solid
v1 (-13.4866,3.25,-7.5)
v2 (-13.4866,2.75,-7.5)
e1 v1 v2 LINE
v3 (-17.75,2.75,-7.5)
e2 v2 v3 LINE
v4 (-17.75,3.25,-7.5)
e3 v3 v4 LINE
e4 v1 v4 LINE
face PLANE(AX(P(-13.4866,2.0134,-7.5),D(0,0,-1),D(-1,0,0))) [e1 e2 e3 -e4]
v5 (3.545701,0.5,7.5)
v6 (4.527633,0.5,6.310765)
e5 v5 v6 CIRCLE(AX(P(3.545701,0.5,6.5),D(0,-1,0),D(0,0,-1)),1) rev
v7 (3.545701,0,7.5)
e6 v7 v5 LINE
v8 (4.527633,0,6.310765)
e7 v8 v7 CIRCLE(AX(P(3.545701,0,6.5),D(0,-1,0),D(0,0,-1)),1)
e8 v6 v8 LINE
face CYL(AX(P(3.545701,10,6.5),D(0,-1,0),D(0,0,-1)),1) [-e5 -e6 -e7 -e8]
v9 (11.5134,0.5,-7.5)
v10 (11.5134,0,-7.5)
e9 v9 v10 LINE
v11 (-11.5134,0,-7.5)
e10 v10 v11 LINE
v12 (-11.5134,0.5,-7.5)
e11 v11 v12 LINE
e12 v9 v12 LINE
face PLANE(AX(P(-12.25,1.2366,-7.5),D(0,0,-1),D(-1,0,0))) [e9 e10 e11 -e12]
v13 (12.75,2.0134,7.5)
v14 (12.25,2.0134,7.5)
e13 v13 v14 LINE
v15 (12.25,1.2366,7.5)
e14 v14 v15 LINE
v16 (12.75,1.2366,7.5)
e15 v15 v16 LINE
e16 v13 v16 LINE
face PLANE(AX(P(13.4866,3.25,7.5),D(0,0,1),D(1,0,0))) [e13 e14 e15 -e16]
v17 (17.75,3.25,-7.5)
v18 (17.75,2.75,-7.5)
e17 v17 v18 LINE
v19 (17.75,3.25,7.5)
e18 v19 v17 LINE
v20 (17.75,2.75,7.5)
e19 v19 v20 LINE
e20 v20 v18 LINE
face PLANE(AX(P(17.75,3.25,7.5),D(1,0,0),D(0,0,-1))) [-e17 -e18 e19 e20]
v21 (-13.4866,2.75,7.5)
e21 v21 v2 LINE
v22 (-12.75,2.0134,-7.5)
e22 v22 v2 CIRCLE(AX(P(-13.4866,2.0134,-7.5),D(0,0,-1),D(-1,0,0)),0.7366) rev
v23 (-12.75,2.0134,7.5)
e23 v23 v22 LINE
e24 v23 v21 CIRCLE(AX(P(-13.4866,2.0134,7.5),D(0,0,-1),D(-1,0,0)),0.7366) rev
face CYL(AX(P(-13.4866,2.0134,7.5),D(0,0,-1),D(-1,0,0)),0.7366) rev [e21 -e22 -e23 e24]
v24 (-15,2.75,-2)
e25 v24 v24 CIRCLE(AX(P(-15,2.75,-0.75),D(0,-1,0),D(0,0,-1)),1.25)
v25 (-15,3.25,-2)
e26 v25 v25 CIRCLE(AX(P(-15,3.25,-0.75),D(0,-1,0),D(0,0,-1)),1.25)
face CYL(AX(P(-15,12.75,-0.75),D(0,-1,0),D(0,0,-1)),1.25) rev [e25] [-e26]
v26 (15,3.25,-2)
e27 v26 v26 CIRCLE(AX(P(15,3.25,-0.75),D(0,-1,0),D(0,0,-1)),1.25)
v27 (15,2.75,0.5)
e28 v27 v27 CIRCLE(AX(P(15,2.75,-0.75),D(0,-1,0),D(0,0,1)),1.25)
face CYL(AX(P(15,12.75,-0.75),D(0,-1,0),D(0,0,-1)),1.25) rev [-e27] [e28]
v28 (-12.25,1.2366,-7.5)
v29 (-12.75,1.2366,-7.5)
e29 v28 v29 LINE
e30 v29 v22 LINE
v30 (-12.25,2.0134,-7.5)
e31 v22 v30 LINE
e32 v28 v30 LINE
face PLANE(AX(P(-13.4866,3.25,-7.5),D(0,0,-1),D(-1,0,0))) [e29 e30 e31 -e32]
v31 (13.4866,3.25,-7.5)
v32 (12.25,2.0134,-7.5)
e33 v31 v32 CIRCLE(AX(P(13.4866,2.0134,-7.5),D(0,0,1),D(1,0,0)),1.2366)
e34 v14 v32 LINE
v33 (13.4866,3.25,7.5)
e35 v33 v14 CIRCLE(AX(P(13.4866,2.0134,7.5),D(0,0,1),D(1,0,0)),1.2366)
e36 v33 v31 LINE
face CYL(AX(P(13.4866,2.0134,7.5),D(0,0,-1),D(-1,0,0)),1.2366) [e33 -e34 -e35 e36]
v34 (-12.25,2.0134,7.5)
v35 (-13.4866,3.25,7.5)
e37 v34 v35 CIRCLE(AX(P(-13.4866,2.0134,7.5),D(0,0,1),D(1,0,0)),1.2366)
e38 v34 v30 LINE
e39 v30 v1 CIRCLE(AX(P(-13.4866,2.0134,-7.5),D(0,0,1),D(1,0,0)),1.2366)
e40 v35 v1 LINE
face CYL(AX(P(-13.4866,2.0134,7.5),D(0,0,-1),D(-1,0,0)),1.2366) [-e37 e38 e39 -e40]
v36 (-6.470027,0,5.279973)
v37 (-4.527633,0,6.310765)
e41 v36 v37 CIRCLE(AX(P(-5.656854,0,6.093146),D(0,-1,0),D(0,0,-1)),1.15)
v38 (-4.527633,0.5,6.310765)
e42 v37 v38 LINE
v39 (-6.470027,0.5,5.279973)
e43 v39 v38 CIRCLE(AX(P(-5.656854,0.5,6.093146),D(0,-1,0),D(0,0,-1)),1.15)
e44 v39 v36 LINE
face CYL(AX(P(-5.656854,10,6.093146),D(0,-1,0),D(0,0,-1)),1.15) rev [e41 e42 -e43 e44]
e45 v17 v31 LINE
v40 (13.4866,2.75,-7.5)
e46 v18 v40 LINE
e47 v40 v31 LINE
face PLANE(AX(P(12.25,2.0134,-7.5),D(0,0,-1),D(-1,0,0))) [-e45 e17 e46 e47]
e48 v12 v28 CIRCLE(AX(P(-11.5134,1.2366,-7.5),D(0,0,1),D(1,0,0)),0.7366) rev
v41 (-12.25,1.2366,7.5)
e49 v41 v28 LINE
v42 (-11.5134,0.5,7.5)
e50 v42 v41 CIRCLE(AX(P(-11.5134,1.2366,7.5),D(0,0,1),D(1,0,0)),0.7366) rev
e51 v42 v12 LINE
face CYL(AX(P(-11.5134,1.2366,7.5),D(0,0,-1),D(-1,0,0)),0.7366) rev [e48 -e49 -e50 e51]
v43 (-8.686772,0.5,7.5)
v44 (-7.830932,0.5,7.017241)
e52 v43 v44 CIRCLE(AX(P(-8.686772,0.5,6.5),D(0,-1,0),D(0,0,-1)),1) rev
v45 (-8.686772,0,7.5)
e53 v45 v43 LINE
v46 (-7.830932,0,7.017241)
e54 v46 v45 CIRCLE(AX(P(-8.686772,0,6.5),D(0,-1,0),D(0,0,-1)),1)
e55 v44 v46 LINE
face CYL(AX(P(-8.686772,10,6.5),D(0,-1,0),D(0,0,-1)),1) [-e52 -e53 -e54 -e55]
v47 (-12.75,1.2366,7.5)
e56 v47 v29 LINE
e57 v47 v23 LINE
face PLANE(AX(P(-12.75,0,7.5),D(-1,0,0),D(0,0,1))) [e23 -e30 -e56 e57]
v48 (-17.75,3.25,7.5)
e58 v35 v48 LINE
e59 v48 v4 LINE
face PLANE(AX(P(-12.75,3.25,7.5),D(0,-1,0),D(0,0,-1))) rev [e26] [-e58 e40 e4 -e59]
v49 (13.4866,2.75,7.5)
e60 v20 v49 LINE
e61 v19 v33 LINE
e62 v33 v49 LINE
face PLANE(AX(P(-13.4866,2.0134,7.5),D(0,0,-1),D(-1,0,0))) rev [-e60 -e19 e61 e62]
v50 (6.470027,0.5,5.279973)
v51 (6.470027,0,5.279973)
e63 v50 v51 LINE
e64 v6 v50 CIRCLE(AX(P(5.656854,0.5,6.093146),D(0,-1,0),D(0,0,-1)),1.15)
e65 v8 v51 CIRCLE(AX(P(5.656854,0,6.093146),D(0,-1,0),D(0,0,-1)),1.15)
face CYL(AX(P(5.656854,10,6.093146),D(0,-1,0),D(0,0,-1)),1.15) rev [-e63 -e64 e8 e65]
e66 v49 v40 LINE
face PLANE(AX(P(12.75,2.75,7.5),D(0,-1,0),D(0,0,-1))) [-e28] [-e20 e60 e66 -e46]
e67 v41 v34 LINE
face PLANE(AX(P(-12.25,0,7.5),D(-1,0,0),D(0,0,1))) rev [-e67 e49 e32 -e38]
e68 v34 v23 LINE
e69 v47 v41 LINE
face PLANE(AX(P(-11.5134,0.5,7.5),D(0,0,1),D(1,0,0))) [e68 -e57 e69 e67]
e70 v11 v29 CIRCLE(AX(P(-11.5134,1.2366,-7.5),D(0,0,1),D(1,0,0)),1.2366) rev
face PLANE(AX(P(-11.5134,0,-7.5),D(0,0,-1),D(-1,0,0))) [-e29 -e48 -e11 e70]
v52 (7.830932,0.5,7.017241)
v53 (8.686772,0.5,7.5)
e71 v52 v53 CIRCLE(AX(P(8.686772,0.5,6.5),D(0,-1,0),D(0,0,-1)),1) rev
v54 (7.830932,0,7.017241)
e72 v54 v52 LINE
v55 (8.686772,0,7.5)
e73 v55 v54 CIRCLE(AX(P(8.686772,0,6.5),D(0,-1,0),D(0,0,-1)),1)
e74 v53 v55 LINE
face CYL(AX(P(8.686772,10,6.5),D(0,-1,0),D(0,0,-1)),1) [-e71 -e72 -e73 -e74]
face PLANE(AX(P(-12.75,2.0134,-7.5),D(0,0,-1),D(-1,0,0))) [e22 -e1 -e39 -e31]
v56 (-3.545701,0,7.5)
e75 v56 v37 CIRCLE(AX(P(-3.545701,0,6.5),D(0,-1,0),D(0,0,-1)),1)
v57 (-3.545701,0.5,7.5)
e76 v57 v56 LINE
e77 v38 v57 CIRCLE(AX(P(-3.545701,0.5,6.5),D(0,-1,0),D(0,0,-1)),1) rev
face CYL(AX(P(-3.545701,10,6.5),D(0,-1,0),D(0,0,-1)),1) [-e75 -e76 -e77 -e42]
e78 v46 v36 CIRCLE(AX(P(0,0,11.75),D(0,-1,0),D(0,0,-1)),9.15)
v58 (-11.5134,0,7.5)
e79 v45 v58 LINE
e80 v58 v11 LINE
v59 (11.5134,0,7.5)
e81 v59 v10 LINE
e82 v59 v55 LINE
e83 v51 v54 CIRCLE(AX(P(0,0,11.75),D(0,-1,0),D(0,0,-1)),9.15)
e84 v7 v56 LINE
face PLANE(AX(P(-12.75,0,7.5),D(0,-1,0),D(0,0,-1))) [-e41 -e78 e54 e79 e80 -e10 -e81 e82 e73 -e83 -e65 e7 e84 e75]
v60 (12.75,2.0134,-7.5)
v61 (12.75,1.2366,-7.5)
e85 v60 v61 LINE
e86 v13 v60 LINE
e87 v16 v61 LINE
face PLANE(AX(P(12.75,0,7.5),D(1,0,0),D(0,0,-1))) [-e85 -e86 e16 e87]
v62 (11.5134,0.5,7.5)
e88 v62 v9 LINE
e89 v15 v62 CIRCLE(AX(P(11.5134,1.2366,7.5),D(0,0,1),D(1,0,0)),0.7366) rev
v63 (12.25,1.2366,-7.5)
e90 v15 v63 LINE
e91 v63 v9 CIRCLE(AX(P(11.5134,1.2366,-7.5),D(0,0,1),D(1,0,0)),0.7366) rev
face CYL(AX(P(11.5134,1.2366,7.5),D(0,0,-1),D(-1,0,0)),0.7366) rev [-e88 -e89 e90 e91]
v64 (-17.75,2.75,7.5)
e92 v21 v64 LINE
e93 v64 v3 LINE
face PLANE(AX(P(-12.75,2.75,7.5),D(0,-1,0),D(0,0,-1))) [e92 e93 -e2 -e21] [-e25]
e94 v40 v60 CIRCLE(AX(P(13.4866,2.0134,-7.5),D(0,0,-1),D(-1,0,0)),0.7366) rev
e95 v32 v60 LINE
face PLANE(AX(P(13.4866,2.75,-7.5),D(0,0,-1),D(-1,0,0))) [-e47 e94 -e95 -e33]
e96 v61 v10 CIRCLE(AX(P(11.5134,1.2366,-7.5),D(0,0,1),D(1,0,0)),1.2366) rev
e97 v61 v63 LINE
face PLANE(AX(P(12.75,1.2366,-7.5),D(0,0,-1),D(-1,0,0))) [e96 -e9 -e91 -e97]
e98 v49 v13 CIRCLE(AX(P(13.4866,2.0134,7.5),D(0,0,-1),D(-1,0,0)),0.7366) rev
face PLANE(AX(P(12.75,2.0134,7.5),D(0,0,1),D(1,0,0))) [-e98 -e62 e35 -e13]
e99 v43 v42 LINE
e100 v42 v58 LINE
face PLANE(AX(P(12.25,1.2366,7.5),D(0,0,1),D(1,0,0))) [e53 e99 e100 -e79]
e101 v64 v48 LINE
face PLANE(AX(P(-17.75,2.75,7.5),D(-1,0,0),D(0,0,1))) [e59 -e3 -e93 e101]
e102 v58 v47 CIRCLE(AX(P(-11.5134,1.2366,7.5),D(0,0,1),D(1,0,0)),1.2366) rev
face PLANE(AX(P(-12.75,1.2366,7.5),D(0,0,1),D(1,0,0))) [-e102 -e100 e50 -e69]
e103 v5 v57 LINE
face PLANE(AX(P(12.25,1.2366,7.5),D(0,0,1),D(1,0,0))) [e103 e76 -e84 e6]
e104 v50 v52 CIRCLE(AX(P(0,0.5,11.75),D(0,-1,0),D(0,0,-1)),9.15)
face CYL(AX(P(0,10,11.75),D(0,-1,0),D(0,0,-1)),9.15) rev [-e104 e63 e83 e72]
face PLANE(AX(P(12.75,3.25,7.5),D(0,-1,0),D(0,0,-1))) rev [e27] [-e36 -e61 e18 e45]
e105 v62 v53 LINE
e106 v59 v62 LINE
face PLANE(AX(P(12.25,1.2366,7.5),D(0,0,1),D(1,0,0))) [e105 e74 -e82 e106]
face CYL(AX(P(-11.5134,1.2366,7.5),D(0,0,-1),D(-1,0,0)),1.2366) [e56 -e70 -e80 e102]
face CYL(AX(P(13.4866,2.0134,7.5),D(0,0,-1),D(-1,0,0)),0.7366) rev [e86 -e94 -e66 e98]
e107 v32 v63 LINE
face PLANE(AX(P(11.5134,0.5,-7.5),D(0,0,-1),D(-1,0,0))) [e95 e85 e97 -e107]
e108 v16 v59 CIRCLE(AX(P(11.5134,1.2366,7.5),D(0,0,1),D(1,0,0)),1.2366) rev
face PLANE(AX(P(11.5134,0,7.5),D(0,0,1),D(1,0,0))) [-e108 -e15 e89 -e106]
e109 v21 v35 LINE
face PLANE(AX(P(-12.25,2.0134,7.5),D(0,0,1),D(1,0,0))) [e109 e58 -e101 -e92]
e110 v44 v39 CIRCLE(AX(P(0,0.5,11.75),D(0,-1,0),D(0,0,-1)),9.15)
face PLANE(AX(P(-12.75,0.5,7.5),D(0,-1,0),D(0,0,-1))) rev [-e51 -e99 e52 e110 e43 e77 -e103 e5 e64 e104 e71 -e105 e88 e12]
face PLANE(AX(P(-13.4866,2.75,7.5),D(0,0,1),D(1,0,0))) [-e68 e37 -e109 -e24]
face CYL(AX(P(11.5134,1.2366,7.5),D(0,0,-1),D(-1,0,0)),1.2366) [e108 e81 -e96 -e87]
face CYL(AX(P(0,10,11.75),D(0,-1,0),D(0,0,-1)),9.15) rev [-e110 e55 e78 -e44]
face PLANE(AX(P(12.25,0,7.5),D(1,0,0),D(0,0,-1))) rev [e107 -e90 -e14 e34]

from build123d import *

# Parameters (mm, degrees)
BASE_FLANGE1_DEPTH = 7.5
SKETCH6_R          = 1.25
CUT_EXTRUDE1_DEPTH = 10
CUT_EXTRUDE2_DEPTH = 10
FILLET1_R          = 1


# Sheet-metal steps are written as plain solids
with BuildPart() as part:
    # Base-Flange1: sheet metal written as solids
    # Sketch1 → Base-Flange1 (new, symmetric)
    with BuildSketch(Plane.XY):
        with BuildLine():
            Line((-17.75, 2.75), (-13.4866, 2.75))
            ThreePointArc((-13.4866, 2.75), (-12.965745145, 2.534254855), (-12.75, 2.0134))
            Line((-12.75, 2.0134), (-12.75, 1.2366))
            ThreePointArc((-12.75, 1.2366), (-12.387808246, 0.362191754), (-11.5134, 0))
            Line((-11.5134, 0), (11.5134, 0))
            ThreePointArc((11.5134, 0), (12.387808246, 0.362191754), (12.75, 1.2366))
            Line((12.75, 1.2366), (12.75, 2.0134))
            ThreePointArc((12.75, 2.0134), (12.965745145, 2.534254855), (13.4866, 2.75))
            Line((13.4866, 2.75), (17.75, 2.75))
            Line((17.75, 2.75), (17.75, 3.25))
            Line((17.75, 3.25), (13.4866, 3.25))
            ThreePointArc((13.4866, 3.25), (12.612191754, 2.887808246), (12.25, 2.0134))
            Line((12.25, 2.0134), (12.25, 1.2366))
            ThreePointArc((12.25, 1.2366), (12.034254855, 0.715745145), (11.5134, 0.5))
            Line((11.5134, 0.5), (-11.5134, 0.5))
            ThreePointArc((-11.5134, 0.5), (-12.034254855, 0.715745145), (-12.25, 1.2366))
            Line((-12.25, 1.2366), (-12.25, 2.0134))
            ThreePointArc((-12.25, 2.0134), (-12.612191754, 2.887808246), (-13.4866, 3.25))
            Line((-13.4866, 3.25), (-17.75, 3.25))
            Line((-17.75, 3.25), (-17.75, 2.75))
        make_face()
    extrude(amount=BASE_FLANGE1_DEPTH, both=True)

    # Sketch6 → Cut-Extrude1 (cut)
    with BuildSketch(Plane.XZ.offset(-2.75)):
        with Locations(Location((-15, -0.75, 0), (0, 0, 270))):
            Circle(SKETCH6_R)
        with Locations(Location((15, -0.75, 0), (0, 0, 270))):
            Circle(SKETCH6_R)
    extrude(amount=-CUT_EXTRUDE1_DEPTH, mode=Mode.SUBTRACT)

    # Sketch7 → Cut-Extrude2 (cut)
    with BuildSketch(Plane.XZ):
        with BuildLine():
            ThreePointArc((-6.470027047, 5.279972953), (-4.843681451, 5.279972953), (-4.843681451, 6.906318549))
            ThreePointArc((-4.843681451, 6.906318549), (0, 18.599999999), (4.843681451, 6.906318549))
            ThreePointArc((4.843681451, 6.906318549), (4.843681451, 5.279972953), (6.470027047, 5.279972953))
            ThreePointArc((6.470027047, 5.279972953), (0, 20.899999999), (-6.470027047, 5.279972953))
        make_face()
    extrude(amount=-CUT_EXTRUDE2_DEPTH, mode=Mode.SUBTRACT)

    # Fillet1
    fillet1_edges = [part.edges().sort_by_distance(p)[0] for p in [
        (8.103085831, 0.25, 7.5),
        (-8.103085831, 0.25, 7.5),
        (-5.372150407, 0.25, 7.5),
        (5.372150407, 0.25, 7.5),
    ]]
    fillet(fillet1_edges, radius=FILLET1_R)


solid = part.part
